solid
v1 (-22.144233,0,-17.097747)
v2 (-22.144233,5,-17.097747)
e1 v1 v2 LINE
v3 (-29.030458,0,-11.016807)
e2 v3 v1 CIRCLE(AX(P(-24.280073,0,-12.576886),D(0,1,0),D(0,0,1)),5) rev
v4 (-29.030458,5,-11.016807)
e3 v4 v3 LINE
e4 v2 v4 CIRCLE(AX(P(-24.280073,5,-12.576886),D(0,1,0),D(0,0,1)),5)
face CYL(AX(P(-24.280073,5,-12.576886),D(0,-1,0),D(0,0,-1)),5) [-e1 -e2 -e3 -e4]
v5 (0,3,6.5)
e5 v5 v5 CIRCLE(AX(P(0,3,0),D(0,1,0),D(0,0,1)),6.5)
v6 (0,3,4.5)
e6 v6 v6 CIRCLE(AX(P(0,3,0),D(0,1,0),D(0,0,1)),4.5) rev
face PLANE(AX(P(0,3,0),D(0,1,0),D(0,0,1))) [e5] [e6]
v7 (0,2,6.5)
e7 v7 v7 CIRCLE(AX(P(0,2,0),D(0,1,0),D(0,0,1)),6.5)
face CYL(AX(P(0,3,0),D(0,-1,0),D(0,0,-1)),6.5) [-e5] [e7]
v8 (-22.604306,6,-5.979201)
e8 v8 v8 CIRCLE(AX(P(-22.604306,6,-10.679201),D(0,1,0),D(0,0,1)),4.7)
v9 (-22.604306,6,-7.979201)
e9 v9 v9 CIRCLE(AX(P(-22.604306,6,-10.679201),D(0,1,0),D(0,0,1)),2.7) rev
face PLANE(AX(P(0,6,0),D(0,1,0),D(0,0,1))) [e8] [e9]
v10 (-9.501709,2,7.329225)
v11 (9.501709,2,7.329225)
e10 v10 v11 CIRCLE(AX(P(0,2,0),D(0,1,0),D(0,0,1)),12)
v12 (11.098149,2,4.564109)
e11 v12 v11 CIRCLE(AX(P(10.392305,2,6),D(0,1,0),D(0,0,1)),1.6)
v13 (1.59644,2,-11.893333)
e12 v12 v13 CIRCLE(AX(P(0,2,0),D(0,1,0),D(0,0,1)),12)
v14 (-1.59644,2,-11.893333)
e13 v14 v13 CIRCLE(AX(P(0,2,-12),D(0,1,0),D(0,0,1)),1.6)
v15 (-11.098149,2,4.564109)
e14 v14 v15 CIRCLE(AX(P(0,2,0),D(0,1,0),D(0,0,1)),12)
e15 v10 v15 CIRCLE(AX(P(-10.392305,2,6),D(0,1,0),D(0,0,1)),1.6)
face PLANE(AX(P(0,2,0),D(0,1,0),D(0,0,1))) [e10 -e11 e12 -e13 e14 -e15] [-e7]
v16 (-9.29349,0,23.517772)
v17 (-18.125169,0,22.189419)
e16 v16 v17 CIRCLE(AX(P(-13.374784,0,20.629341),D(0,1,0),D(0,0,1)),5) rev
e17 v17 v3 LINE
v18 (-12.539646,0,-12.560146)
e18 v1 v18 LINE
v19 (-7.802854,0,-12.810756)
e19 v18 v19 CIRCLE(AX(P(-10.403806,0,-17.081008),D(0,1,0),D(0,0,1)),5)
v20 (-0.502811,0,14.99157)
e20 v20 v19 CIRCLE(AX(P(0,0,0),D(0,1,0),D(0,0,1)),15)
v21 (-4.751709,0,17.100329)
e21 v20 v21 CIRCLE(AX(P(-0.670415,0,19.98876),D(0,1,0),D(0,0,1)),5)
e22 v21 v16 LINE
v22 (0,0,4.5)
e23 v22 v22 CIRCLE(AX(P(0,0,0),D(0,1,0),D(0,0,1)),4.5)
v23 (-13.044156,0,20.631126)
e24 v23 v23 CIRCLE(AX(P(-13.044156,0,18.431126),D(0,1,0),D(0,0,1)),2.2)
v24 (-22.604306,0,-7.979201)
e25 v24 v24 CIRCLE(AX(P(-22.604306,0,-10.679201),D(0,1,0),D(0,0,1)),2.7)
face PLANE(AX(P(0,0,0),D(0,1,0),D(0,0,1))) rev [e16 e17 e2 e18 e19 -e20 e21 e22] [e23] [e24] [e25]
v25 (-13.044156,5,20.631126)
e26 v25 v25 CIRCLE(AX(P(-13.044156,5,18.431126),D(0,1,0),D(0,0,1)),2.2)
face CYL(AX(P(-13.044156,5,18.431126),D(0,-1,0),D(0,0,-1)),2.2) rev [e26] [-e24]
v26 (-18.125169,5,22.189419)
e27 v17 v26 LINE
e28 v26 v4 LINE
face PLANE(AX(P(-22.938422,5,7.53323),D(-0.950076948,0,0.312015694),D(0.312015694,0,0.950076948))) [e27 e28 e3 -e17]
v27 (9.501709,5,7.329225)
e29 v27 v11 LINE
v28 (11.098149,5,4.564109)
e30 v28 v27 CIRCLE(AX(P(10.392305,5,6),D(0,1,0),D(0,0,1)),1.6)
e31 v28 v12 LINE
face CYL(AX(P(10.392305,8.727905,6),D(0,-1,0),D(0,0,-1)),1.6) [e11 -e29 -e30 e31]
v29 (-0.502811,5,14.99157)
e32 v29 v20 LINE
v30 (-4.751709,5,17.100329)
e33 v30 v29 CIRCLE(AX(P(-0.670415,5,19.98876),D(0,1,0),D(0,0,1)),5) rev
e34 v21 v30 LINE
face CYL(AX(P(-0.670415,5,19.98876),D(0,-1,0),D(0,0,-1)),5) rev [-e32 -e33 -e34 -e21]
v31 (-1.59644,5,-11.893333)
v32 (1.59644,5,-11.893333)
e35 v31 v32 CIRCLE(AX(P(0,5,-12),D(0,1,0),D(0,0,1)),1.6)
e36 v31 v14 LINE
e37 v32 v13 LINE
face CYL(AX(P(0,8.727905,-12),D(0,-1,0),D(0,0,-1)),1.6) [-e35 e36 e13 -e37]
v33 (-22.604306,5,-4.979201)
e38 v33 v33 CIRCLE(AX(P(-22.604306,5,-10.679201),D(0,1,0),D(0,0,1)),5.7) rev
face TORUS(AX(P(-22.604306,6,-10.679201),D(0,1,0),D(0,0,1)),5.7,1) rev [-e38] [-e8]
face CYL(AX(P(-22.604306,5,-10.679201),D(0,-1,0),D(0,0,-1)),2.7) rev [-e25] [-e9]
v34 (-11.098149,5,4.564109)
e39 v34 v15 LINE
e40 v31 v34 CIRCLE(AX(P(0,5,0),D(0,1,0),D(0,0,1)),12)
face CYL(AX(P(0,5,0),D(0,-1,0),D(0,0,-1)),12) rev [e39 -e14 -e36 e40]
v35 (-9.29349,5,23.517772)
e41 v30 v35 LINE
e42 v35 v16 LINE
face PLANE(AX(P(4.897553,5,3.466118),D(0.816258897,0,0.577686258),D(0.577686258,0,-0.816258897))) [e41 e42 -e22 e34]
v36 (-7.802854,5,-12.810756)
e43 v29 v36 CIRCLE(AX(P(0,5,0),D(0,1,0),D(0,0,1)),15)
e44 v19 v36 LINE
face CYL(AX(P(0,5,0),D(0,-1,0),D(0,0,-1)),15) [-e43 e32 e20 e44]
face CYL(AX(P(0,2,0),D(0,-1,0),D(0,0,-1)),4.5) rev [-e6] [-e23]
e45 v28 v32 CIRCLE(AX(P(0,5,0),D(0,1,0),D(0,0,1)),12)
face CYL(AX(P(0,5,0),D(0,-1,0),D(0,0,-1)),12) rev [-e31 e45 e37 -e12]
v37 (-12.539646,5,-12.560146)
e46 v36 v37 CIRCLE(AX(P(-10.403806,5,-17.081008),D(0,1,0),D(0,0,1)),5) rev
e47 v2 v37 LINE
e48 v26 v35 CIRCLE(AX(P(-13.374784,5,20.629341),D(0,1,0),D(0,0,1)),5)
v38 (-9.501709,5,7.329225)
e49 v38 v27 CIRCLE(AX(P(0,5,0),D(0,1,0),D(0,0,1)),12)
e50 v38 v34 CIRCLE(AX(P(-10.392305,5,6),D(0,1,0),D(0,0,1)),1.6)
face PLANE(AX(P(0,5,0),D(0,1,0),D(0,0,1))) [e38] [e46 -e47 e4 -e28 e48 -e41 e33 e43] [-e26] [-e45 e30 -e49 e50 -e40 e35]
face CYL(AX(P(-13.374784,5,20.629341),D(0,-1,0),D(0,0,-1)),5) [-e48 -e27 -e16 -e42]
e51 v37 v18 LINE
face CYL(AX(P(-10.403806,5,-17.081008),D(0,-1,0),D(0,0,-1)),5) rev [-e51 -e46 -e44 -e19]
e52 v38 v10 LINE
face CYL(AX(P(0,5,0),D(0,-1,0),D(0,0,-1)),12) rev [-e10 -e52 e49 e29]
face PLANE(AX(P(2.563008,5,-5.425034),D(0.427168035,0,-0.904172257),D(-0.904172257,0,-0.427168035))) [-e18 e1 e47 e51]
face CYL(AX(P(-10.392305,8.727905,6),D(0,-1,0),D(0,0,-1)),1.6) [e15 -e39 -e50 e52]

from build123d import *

# Parameters (mm, degrees)
SKETCH2_R           = 12
SKETCH2_R_2         = 2.2
SKETCH2_R_3         = 2.7
BOSS_EXTRUDE1_DEPTH = 5
SKETCH2_4_R         = 4.5
BOSS_EXTRUDE2_DEPTH = 2
FILLET1_R           = 5
FILLET2_R           = 5
SKETCH3_R           = 4.7
SKETCH3_R_2         = 2.7
BOSS_EXTRUDE3_DEPTH = 1
FILLET4_R           = 1
SKETCH4_R           = 6.5
SKETCH4_R_2         = 4.5
BOSS_EXTRUDE5_DEPTH = 1
BOSS_EXTRUDE6_DEPTH = 3


with BuildPart() as part:
    # Sketch2 → Boss-Extrude1 (new body)
    with BuildSketch(Plane(origin=(0, 0, 0), x_dir=(1, 0, 0), z_dir=(0, 1, 0))):
        with BuildLine():
            Line((-32.658907628, 22.065310299), (-15.027926619, -31.62041432))
            Line((-15.027926619, -31.62041432), (-3.044319626, -14.687822099))
            ThreePointArc((-3.044319626, -14.687822099), (14.508216797, 3.809415358), (-9.86730521, 11.297623108))
            Line((-9.86730521, 11.297623108), (-32.658907628, 22.065310299))
        make_face()
        with Locations(Location((0, 0, 0), (0, 0, 270))):
            Circle(SKETCH2_R, mode=Mode.SUBTRACT)
        with Locations(Location((-13.044155697, -18.431125905, 0), (0, 0, 270))):
            Circle(SKETCH2_R_2, mode=Mode.SUBTRACT)
        with Locations(Location((-22.604306415, 10.679200882, 0), (0, 0, 270))):
            Circle(SKETCH2_R_3, mode=Mode.SUBTRACT)
    extrude(amount=BOSS_EXTRUDE1_DEPTH)

    # Sketch2<4> → Boss-Extrude2 (add)
    # profile 1 of 2: a face of its own
    with BuildSketch(Plane(origin=(0, 0, 0), x_dir=(1, 0, 0), z_dir=(0, 1, 0))):
        with BuildLine():
            Line((9.028311423, 2.370559296), (-1.105938309, -11.948928841))
            ThreePointArc((-1.105938309, -11.948928841), (8.084823445, -8.867673306), (12, 0))
            ThreePointArc((12, 0), (5.567714695, 10.630171827), (-6.833425512, 9.864293983))
            Line((-6.833425512, 9.864293983), (9.028311423, 2.370559296))
        make_face()
    # profile 2 of 2: a face of its own
    with BuildSketch(Plane(origin=(0, 0, 0), x_dir=(1, 0, 0), z_dir=(0, 1, 0))):
        with BuildLine():
            ThreePointArc((-6.833425512, 9.864293983), (-11.606573438, -3.047532287), (-1.105938309, -11.948928841))
            Line((-1.105938309, -11.948928841), (9.028311423, 2.370559296))
            Line((9.028311423, 2.370559296), (-6.833425512, 9.864293983))
        make_face()
        with Locations(Location((0, 0, 0), (0, 0, 270))):
            Circle(SKETCH2_4_R, mode=Mode.SUBTRACT)
    extrude(amount=BOSS_EXTRUDE2_DEPTH)

    # Fillet1
    fillet1_edges = [part.edges().sort_by_distance(p)[0] for p in [
        (-15.027926619, 2.5, 31.62041432),
        (-32.658907628, 2.5, -22.065310299),
    ]]
    fillet(fillet1_edges, radius=FILLET1_R)

    # Fillet2
    fillet2_edges = [part.edges().sort_by_distance(p)[0] for p in [
        (-9.86730521, 2.5, -11.297623108),
        (-3.044319626, 2.5, 14.687822099),
    ]]
    fillet(fillet2_edges, radius=FILLET2_R)

    # Sketch3 → Boss-Extrude3 (add)
    with BuildSketch(Plane(origin=(0, 5, 0), x_dir=(1, 0, 0), z_dir=(0, 1, 0))):
        with Locations(Location((-22.604306415, 10.679200882, 0), (0, 0, 270))):
            Circle(SKETCH3_R)
        with Locations(Location((-22.604306415, 10.679200882, 0), (0, 0, 270))):
            Circle(SKETCH3_R_2, mode=Mode.SUBTRACT)
    extrude(amount=BOSS_EXTRUDE3_DEPTH)

    # Fillet4
    fillet4_edges = [part.edges().sort_by_distance(p)[0] for p in [
        (-22.604306415, 5, -15.379200882),
    ]]
    fillet(fillet4_edges, radius=FILLET4_R - 0.0001)  # a hair under: the kernel refuses the full size

    # Sketch4 → Boss-Extrude5 (add)
    with BuildSketch(Plane(origin=(0, 2, 0), x_dir=(1, 0, 0), z_dir=(0, 1, 0))):
        with Locations(Location((0, 0, 0), (0, 0, 270))):
            Circle(SKETCH4_R)
        with Locations(Location((0, 0, 0), (0, 0, 270))):
            Circle(SKETCH4_R_2, mode=Mode.SUBTRACT)
    extrude(amount=BOSS_EXTRUDE5_DEPTH)

    # Sketch4<4> → Boss-Extrude6 (add)
    with BuildSketch(Plane(origin=(0, 2, 0), x_dir=(1, 0, 0), z_dir=(0, 1, 0))):
        with BuildLine():
            ThreePointArc((1.596440485, 11.893333333), (0, 12), (-1.596440485, 11.893333333))
            ThreePointArc((-1.596440485, 11.893333333), (0, 10.4), (1.596440485, 11.893333333))
        make_face()
        with BuildLine():
            ThreePointArc((9.50170856, -7.329224682), (10.392304845, -6), (11.098149045, -4.564108651))
            ThreePointArc((11.098149045, -4.564108651), (9.006664199, -5.2), (9.50170856, -7.329224682))
        make_face()
        with BuildLine():
            ThreePointArc((-9.50170856, -7.329224682), (-9.006664199, -5.2), (-11.098149045, -4.564108651))
            ThreePointArc((-11.098149045, -4.564108651), (-10.392304845, -6), (-9.50170856, -7.329224682))
        make_face()
    extrude(amount=BOSS_EXTRUDE6_DEPTH)


solid = part.part
